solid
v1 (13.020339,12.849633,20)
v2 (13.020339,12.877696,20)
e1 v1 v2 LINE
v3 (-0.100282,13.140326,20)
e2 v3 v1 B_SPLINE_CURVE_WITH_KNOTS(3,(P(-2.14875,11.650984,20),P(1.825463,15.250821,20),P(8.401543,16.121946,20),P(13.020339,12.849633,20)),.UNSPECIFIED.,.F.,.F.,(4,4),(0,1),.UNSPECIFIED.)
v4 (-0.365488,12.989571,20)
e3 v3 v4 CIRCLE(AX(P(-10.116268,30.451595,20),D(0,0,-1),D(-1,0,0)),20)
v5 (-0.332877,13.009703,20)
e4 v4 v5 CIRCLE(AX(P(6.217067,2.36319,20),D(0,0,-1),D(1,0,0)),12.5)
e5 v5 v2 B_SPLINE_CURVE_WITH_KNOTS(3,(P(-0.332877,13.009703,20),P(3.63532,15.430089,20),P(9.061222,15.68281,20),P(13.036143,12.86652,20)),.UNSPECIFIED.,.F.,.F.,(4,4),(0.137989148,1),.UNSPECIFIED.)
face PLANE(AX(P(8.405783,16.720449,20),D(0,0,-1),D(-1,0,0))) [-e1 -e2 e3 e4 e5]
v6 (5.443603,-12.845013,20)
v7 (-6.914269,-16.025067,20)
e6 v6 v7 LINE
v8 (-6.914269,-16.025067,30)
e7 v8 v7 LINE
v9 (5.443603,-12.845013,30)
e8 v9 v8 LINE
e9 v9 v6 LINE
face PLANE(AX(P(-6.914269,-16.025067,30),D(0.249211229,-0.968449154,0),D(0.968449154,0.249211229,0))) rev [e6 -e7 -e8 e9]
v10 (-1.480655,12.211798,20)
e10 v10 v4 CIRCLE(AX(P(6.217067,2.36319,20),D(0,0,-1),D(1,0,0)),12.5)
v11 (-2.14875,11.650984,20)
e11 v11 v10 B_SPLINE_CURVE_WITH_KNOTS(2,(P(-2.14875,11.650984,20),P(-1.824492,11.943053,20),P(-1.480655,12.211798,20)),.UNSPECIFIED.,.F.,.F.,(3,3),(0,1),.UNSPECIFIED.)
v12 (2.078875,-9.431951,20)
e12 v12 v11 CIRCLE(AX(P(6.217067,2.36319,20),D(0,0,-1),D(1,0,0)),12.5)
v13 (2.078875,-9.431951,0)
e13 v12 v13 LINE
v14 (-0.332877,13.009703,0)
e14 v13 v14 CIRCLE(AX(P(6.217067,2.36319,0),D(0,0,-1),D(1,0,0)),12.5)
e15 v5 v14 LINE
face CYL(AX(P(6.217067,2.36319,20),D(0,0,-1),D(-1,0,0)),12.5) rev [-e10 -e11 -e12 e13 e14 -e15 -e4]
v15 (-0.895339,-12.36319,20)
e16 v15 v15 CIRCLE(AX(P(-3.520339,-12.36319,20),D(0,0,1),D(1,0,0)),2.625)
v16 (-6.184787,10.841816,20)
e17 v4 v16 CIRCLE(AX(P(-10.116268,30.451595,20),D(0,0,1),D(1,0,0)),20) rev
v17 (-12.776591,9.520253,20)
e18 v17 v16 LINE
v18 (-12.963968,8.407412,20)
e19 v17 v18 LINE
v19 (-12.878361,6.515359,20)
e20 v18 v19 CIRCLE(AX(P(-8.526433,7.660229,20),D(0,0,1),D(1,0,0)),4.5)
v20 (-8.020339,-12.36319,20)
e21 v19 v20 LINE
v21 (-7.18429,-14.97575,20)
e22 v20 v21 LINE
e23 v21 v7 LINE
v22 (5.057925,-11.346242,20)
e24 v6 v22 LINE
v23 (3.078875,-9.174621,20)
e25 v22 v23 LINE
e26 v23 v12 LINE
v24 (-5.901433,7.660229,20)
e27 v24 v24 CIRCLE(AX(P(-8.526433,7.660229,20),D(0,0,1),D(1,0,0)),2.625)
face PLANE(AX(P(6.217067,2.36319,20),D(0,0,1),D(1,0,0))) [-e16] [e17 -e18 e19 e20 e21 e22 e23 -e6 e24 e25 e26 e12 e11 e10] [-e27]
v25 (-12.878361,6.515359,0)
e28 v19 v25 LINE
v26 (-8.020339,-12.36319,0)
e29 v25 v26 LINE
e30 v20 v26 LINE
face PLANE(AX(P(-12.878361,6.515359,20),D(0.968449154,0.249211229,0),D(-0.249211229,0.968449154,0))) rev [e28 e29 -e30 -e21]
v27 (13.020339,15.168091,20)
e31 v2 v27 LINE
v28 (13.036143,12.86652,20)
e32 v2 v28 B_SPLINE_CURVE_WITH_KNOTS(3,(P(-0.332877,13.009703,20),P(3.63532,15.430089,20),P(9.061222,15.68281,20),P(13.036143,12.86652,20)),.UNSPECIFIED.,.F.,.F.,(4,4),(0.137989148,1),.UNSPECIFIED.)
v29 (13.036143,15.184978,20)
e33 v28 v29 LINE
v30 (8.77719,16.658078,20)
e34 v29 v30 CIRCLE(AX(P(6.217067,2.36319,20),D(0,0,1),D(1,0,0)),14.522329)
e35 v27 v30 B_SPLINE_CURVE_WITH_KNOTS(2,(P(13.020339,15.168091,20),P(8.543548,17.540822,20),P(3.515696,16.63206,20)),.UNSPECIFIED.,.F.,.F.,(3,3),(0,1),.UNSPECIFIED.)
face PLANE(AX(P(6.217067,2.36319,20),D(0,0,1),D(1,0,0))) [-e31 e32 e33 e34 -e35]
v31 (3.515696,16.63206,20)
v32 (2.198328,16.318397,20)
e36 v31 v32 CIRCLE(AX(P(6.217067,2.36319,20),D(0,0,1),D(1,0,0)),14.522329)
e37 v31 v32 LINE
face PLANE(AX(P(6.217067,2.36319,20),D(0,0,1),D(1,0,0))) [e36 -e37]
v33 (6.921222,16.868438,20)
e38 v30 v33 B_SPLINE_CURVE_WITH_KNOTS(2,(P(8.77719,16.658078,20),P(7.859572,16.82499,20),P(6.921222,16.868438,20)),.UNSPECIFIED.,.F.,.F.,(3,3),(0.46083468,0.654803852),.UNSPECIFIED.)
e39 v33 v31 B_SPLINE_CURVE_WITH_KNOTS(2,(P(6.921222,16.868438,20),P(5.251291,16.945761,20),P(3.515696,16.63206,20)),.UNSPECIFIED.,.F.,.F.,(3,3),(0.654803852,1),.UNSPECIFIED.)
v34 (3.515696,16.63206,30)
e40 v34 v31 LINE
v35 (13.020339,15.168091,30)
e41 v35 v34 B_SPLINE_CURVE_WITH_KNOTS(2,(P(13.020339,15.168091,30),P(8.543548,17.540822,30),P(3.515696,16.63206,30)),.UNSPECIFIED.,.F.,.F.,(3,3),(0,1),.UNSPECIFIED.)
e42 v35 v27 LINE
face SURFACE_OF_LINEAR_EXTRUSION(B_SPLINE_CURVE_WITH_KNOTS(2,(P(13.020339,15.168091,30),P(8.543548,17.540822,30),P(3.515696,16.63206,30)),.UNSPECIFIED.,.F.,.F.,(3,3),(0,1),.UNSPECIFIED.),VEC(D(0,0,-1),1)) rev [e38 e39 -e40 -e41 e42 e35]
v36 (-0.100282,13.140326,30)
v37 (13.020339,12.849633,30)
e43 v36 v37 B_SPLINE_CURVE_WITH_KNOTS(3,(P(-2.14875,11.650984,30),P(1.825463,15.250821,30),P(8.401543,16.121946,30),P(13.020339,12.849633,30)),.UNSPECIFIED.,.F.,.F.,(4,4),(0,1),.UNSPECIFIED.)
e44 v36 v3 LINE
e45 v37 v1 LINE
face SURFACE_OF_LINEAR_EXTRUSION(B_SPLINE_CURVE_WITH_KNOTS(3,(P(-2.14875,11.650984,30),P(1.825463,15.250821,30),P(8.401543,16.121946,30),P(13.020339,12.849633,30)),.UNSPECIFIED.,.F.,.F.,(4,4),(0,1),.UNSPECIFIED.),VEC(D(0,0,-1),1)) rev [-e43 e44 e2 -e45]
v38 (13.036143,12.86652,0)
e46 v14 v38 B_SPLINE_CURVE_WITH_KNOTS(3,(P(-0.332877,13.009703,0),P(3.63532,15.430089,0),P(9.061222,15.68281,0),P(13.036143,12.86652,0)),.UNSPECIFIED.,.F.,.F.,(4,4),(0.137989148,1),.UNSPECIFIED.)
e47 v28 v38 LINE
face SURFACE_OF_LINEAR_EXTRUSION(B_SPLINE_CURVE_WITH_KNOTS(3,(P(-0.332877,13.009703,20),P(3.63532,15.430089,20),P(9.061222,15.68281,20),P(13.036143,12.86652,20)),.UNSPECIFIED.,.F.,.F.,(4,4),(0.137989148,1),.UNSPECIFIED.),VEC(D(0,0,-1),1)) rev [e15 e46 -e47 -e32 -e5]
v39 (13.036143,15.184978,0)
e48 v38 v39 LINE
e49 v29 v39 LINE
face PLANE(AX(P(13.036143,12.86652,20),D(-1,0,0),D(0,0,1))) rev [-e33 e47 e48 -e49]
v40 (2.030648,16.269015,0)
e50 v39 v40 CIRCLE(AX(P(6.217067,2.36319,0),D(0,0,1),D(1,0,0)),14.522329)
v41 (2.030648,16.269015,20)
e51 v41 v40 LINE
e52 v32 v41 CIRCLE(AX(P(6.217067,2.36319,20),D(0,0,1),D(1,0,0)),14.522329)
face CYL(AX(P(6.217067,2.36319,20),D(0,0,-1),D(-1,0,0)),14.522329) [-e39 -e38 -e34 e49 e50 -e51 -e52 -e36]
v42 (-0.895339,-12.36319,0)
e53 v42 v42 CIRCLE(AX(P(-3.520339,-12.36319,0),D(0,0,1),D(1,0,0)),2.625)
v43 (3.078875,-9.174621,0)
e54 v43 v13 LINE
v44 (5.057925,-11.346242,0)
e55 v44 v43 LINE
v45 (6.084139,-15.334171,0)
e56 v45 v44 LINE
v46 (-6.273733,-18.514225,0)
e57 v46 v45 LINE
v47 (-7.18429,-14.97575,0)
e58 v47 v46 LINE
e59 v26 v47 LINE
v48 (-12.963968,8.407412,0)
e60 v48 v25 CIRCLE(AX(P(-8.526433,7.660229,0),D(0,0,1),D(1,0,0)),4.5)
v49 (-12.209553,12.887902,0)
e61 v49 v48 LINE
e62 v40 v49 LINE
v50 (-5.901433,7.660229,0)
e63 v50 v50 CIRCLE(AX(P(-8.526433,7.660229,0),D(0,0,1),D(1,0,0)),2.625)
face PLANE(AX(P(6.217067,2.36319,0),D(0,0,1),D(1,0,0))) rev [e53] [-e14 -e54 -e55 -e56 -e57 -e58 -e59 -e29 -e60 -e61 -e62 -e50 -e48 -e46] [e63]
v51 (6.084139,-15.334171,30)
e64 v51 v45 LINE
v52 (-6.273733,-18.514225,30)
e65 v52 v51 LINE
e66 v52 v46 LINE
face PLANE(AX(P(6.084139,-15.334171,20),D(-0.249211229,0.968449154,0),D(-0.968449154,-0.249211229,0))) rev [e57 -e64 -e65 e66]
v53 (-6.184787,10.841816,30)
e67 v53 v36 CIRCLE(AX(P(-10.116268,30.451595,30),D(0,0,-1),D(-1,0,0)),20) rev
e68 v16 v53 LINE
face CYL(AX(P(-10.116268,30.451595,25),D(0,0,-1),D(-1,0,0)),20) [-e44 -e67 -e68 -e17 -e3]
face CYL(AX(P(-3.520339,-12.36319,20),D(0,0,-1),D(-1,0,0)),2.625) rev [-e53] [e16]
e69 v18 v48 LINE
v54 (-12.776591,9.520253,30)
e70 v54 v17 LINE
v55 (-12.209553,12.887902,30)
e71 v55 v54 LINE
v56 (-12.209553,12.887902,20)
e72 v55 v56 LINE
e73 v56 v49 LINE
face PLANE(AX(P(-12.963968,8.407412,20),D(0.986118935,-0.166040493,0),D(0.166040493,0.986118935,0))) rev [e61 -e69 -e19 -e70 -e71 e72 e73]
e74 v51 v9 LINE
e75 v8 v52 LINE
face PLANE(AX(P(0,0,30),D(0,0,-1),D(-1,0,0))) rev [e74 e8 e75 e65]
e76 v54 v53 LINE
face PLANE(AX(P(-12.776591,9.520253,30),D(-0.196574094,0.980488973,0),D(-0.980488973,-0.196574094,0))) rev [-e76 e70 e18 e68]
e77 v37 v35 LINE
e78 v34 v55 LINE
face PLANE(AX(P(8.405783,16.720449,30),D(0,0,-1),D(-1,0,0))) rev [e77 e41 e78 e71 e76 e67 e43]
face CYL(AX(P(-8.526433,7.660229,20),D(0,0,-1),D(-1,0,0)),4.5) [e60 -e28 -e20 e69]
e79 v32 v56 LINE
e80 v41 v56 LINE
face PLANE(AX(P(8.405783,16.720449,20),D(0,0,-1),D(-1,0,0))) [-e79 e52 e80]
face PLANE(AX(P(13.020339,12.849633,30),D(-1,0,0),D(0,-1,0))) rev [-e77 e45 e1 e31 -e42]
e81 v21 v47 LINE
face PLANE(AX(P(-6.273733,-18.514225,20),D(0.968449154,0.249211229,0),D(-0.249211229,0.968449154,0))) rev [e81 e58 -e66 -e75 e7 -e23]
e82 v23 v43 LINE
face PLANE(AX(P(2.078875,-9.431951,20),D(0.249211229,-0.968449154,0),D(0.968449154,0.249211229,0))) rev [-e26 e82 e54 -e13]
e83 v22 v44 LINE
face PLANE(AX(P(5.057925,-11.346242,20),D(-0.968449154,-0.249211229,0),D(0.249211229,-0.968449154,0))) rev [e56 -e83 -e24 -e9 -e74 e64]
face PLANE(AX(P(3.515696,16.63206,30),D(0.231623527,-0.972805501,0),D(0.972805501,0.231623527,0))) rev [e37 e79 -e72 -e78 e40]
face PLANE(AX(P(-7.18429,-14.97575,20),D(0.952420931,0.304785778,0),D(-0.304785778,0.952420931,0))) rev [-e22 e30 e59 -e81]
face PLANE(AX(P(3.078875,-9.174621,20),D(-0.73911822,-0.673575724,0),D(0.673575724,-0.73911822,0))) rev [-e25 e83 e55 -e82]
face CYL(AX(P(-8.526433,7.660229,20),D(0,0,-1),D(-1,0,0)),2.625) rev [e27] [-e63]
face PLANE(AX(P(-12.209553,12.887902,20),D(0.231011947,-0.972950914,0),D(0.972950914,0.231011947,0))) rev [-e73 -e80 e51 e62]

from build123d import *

# Parameters (mm, degrees)
ESQUISSE1_R        = 2.625
BOSS_EXTRU_1_DEPTH = 20
BOSS_EXTRU_2_DEPTH = 10
CONG_1_R           = 20


with BuildPart() as part:
    # Esquisse1 → Boss.-Extru.1 (new body)
    with BuildSketch(Plane.XY):
        with BuildLine():
            Line((-12.878360569, 6.515359117), (-8.020339377, -12.363190353))
            Line((-8.020339377, -12.363190353), (-7.184290041, -14.975749546))
            Line((-7.184290041, -14.975749546), (-6.273733273, -18.514225461))
            Line((-6.273733273, -18.514225461), (6.084139136, -15.334171498))
            Line((6.084139136, -15.334171498), (5.057924502, -11.346242467))
            Line((5.057924502, -11.346242467), (3.078875229, -9.174621187))
            Line((3.078875229, -9.174621187), (2.078875229, -9.431951402))
            ThreePointArc((2.078875229, -9.431951402), (-6.211369181, 1.027535241), (-0.332877148, 13.009703018))
            add(Edge.make_bspline(
                [(-0.332877148, 13.009703018), (3.635319831, 15.430088875), (9.061222384, 15.682810055), (13.036143443, 12.866520456)],
                knots=[0.137989148, 0.137989148, 0.137989148, 0.137989148, 1, 1, 1, 1], degree=3))
            Line((13.036143443, 12.866520456), (13.036143443, 15.184978364))
            ThreePointArc((13.036143443, 15.184978364), (7.640620829, 16.815579292), (2.030648386, 16.269014707))
            Line((2.030648386, 16.269014707), (-12.209553486, 12.887901937))
            Line((-12.209553486, 12.887901937), (-12.963968388, 8.407411627))
            ThreePointArc((-12.963968388, 8.407411627), (-13.021834037, 7.456830476), (-12.878360569, 6.515359117))
        make_face()
        with Locations((-8.526433179, 7.660229409)):
            Circle(ESQUISSE1_R, mode=Mode.SUBTRACT)
        with Locations((-3.520339377, -12.363190353)):
            Circle(ESQUISSE1_R, mode=Mode.SUBTRACT)
    extrude(amount=BOSS_EXTRU_1_DEPTH)

    # Esquisse2 → Boss.-Extru.2 (add)
    with BuildSketch(Plane.XY.offset(20)):
        with BuildLine():
            Line((3.515696045, 16.632060199), (-12.209553486, 12.887901937))
            Line((-12.209553486, 12.887901937), (-12.776590706, 9.520252701))
            Line((-12.776590706, 9.520252701), (-2.148750203, 11.650983572))
            add(Edge.make_bspline(
                [(-2.148750203, 11.650983572), (1.825462535, 15.250820675), (8.40154324, 16.121946302), (13.020339377, 12.849633253)],
                knots=[0, 0, 0, 0, 1, 1, 1, 1], degree=3))
            Line((13.020339377, 12.849633253), (13.020339377, 15.168091161))
            add(Edge.make_bspline(
                [(13.020339377, 15.168091161), (8.543548068, 17.54082168), (3.515696045, 16.632060199)],
                knots=[0, 0, 0, 1, 1, 1], degree=2))
        make_face()
        Polygon((-6.273733273, -18.514225461), (-6.914268997, -16.025066838), (5.443603413, -12.845012876), (6.084139136, -15.334171498), align=None)
    extrude(amount=BOSS_EXTRU_2_DEPTH)

    # Congé1
    # the kernel refuses this fillet: 20 mm, written as the material it takes off along each edge
    with BuildSketch(Plane(origin=(-2.148750203, 11.650983572, 20), x_dir=(0.8088209493644074, 0.5880549905147126, 0), z_dir=(0, 0, 1))) as cong_1_piece_1:
        with BuildLine():
            CenterArc((4.611497796, 19.891667354), CONG_1_R, 245.31758692, 18.716203056)
            Line((-3.740265961, 1.718939376), (-3.907301236, 1.355484817))
            Line((-3.907301236, 1.355484817), (-0.167035275, -0.36345456))
            Line((-0.167035275, -0.36345456), (0.042860615, -0.39769708))
            ThreePointArc((0.042860615, -0.39769708), (1.26605814, -0.333034673), (2.491082434, -0.397833347))
            Line((2.491082434, -0.397833347), (2.532659206, 0))
        make_face()
    extrude(amount=10, mode=Mode.SUBTRACT)


solid = part.part
